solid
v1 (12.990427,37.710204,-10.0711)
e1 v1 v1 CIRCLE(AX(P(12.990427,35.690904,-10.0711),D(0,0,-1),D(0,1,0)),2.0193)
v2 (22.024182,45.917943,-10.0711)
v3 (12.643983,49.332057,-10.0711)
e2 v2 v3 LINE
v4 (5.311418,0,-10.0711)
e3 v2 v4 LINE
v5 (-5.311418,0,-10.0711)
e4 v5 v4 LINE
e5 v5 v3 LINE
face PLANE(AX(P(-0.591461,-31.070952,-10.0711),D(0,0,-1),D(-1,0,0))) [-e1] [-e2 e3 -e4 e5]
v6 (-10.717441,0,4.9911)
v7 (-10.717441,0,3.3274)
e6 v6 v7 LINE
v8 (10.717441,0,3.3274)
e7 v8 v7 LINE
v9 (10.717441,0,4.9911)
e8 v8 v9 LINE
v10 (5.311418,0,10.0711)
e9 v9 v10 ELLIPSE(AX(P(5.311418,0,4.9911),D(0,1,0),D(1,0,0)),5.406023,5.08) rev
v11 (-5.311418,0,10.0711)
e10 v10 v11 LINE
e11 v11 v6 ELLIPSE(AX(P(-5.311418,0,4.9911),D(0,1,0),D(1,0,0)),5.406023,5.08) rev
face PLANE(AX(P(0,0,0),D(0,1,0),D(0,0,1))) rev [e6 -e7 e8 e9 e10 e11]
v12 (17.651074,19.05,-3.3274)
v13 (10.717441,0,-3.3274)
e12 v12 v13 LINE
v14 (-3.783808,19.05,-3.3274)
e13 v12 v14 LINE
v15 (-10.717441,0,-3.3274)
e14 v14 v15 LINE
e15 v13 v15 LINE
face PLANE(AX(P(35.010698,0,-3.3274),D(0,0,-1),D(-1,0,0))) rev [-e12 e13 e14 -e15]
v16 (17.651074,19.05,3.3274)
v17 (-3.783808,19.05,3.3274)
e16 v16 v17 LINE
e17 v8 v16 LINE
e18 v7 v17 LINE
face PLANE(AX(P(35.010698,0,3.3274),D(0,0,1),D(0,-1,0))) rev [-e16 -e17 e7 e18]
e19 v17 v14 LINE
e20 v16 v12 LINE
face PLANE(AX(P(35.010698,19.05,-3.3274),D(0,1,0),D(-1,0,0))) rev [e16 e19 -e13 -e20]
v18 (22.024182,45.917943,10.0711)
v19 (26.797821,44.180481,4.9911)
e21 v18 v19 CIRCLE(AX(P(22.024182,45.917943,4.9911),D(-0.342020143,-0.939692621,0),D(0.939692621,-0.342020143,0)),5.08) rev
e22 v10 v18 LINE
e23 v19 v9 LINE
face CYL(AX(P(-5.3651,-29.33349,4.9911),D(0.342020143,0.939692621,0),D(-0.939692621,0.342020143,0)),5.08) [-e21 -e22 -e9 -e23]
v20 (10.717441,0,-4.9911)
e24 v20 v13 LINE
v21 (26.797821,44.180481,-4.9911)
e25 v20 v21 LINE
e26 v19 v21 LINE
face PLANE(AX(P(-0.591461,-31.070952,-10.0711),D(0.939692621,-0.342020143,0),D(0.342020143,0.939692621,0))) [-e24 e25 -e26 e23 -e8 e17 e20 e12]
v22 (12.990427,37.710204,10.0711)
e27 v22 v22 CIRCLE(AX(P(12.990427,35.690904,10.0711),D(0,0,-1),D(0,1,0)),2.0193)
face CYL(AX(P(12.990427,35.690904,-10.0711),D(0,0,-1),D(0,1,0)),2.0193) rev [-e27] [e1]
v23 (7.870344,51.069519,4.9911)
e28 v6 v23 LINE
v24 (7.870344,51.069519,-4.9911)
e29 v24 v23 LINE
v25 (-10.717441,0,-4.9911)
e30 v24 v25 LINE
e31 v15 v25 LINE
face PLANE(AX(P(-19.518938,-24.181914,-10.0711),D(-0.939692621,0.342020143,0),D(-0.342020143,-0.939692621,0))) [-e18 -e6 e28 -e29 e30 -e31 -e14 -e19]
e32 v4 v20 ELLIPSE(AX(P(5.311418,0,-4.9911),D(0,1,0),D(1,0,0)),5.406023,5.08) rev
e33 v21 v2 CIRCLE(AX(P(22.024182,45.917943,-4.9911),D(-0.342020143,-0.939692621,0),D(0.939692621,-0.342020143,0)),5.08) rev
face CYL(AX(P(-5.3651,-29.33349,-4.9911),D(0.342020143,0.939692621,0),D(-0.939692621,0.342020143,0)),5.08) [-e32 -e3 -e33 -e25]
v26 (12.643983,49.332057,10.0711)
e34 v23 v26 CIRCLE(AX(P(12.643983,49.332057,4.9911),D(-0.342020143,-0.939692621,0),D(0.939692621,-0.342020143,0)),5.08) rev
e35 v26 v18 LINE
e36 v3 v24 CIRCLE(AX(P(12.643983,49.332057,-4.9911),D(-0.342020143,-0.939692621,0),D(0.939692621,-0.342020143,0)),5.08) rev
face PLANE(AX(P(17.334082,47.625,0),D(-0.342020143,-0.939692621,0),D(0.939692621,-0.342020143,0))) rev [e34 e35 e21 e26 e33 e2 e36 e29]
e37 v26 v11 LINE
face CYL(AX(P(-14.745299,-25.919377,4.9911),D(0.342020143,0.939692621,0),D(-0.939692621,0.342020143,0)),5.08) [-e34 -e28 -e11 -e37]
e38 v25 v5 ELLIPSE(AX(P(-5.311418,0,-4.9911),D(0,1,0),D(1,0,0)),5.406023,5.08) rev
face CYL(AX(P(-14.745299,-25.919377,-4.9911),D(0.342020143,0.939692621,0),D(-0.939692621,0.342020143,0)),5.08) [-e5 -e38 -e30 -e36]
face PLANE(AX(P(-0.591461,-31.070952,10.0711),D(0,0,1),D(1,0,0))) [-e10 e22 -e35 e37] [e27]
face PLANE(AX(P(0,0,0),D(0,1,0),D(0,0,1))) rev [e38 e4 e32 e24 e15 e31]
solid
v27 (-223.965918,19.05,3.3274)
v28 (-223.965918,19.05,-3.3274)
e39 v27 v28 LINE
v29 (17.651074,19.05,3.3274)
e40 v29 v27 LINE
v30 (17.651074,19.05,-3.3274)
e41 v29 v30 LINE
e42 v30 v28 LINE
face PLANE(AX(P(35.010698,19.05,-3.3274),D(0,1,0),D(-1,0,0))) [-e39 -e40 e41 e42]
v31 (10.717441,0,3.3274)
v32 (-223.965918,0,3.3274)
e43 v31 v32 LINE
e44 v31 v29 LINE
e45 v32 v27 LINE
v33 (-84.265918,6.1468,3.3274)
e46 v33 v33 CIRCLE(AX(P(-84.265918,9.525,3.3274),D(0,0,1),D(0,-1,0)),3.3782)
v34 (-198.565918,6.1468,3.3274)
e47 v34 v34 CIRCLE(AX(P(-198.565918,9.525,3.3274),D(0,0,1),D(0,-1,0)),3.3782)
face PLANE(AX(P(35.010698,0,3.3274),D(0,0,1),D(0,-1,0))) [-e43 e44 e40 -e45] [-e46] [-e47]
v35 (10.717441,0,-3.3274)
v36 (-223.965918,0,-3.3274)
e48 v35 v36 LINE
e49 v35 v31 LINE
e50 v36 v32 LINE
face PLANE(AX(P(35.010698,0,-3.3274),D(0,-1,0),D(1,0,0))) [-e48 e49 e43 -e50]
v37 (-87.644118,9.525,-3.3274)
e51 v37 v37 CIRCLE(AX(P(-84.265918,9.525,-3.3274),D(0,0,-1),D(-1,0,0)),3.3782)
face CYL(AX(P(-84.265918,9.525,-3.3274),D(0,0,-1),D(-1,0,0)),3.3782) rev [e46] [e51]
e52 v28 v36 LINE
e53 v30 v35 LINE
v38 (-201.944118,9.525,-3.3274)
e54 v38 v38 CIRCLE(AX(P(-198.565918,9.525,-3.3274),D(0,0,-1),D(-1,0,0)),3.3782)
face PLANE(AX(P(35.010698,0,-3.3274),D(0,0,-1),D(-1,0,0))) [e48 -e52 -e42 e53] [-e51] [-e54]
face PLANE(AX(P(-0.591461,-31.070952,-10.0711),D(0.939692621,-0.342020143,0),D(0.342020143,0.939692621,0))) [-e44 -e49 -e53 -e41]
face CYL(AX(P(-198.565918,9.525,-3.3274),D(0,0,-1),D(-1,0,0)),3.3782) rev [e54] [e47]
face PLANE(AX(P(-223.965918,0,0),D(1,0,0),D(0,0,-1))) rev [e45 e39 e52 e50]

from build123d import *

# Parameters (mm, degrees)
BOSS_EXTRUDE2_REACH              = 81.995
SKETCH9_W                        = 20.1422
SKETCH9_H                        = 20.1422
F_10_32_TAPPED_HOLE1_D           = 4.0386
CUT_EXTRUDE2_REACH               = 260.624
SKETCH11_W                       = 6.6548
SKETCH11_H                       = 19.05
FILLET1_R                        = 5.08
BOSS_EXTRUDE3_REACH              = 260.624
SKETCH11_2_W                     = 6.6548
SKETCH11_2_H                     = 19.05
SKETCH17_W                       = 3.3782
SKETCH17_H                       = 13.3985
F_1_4_CLEARANCE_HOLE1_AT_2_COUNT = 2
F_1_4_CLEARANCE_HOLE1_AT_2_PITCH = 114.3


with BuildPart() as part:
    # Boss-Extrude2: up to this plane
    boss_extrude2_end = Plane(origin=(0, 0, 0), z_dir=(0, 1, 0))
    # Sketch9 → Boss-Extrude2 (new, up to the surface)
    with BuildSketch(Plane(origin=(17.334082407, 47.625, 0), x_dir=(0.939692620785907, -0.34202014332567254, 0), z_dir=(0.34202014332567254, 0.939692620785907, 0)), mode=Mode.PRIVATE) as boss_extrude2_sk1:
        Rectangle(SKETCH9_W, SKETCH9_H)
    boss_extrude2_tool1 = split(extrude(boss_extrude2_sk1.sketch, amount=-BOSS_EXTRUDE2_REACH, mode=Mode.PRIVATE), bisect_by=boss_extrude2_end, keep=Keep.BOTH, mode=Mode.PRIVATE)
    add(boss_extrude2_tool1.solids().sort_by_distance((17.334082, 47.625, 0))[0])

    # #10-32 Tapped Hole1 (through all)
    with Locations(Plane(origin=(0, 0, -10.0711), x_dir=(-1, 0, 0), z_dir=(0, 0, -1))):
        with Locations((-12.990426587, 35.690903716)):
            Hole(F_10_32_TAPPED_HOLE1_D / 2)

    # Cut-Extrude2: up to this plane
    cut_extrude2_end = Plane(origin=(-0.591461061, -31.070952403, -10.0711), z_dir=(0.939692620785907, -0.34202014332567254, 0))
    # Sketch11 → Cut-Extrude2 (cut, up to the surface)
    with BuildSketch(Plane.ZY.offset(223.965917593), mode=Mode.PRIVATE) as cut_extrude2_sk1:
        with Locations((0, 9.525)):
            Rectangle(SKETCH11_W, SKETCH11_H)
    cut_extrude2_tool1 = split(extrude(cut_extrude2_sk1.sketch, amount=-CUT_EXTRUDE2_REACH, mode=Mode.PRIVATE), bisect_by=cut_extrude2_end, keep=Keep.BOTH, mode=Mode.PRIVATE)
    add(cut_extrude2_tool1.solids().sort_by_distance((-223.965918, 9.525, 0))[0], mode=Mode.SUBTRACT)

    # Fillet1
    fillet1_edges = [part.edges().sort_by_distance(p)[0] for p in [
        (18.757630762, 22.090240467, 10.0711),
        (-1.423548355, 25.534759533, 10.0711),
        (-1.423548355, 25.534759533, -10.0711),
        (18.757630762, 22.090240467, -10.0711),
    ]]
    fillet(fillet1_edges, radius=FILLET1_R)


with BuildPart() as body_2:
    # Boss-Extrude3: up to this plane
    boss_extrude3_end = Plane(origin=(-0.591461061, -31.070952403, -10.0711), z_dir=(0.939692620785907, -0.34202014332567254, 0))
    # Sketch11<2> → Boss-Extrude3 (new, up to the surface)
    with BuildSketch(Plane.ZY.offset(223.965917593), mode=Mode.PRIVATE) as boss_extrude3_sk1:
        with Locations((0, 9.525)):
            Rectangle(SKETCH11_2_W, SKETCH11_2_H)
    boss_extrude3_tool1 = split(extrude(boss_extrude3_sk1.sketch, amount=-BOSS_EXTRUDE3_REACH, mode=Mode.PRIVATE), bisect_by=boss_extrude3_end, keep=Keep.BOTH, mode=Mode.PRIVATE)
    add(boss_extrude3_tool1.solids().sort_by_distance((-223.965918, 9.525, 0))[0])

    # Sketch17 → 1/4 Clearance Hole1 (revolve, cut)
    with BuildSketch(Plane(origin=(-84.265917593, 9.525, -3.3274), x_dir=(0, 1, 0), z_dir=(1, 0, 0))):
        with Locations((1.6891, 6.69925)):
            Rectangle(SKETCH17_W, SKETCH17_H)
    f_1_4_clearance_hole1 = revolve(axis=Axis((-84.265917593, 9.525, -9.6774), (0, 0, 1)), mode=Mode.SUBTRACT)

    # 1/4 Clearance Hole1 at 2: 1/4 Clearance Hole1 ×2
    with Locations(*[(-i * F_1_4_CLEARANCE_HOLE1_AT_2_PITCH, 0, 0) for i in range(1, F_1_4_CLEARANCE_HOLE1_AT_2_COUNT)]):
        add(f_1_4_clearance_hole1, mode=Mode.SUBTRACT)


solid = Compound([part.part, body_2.part])
